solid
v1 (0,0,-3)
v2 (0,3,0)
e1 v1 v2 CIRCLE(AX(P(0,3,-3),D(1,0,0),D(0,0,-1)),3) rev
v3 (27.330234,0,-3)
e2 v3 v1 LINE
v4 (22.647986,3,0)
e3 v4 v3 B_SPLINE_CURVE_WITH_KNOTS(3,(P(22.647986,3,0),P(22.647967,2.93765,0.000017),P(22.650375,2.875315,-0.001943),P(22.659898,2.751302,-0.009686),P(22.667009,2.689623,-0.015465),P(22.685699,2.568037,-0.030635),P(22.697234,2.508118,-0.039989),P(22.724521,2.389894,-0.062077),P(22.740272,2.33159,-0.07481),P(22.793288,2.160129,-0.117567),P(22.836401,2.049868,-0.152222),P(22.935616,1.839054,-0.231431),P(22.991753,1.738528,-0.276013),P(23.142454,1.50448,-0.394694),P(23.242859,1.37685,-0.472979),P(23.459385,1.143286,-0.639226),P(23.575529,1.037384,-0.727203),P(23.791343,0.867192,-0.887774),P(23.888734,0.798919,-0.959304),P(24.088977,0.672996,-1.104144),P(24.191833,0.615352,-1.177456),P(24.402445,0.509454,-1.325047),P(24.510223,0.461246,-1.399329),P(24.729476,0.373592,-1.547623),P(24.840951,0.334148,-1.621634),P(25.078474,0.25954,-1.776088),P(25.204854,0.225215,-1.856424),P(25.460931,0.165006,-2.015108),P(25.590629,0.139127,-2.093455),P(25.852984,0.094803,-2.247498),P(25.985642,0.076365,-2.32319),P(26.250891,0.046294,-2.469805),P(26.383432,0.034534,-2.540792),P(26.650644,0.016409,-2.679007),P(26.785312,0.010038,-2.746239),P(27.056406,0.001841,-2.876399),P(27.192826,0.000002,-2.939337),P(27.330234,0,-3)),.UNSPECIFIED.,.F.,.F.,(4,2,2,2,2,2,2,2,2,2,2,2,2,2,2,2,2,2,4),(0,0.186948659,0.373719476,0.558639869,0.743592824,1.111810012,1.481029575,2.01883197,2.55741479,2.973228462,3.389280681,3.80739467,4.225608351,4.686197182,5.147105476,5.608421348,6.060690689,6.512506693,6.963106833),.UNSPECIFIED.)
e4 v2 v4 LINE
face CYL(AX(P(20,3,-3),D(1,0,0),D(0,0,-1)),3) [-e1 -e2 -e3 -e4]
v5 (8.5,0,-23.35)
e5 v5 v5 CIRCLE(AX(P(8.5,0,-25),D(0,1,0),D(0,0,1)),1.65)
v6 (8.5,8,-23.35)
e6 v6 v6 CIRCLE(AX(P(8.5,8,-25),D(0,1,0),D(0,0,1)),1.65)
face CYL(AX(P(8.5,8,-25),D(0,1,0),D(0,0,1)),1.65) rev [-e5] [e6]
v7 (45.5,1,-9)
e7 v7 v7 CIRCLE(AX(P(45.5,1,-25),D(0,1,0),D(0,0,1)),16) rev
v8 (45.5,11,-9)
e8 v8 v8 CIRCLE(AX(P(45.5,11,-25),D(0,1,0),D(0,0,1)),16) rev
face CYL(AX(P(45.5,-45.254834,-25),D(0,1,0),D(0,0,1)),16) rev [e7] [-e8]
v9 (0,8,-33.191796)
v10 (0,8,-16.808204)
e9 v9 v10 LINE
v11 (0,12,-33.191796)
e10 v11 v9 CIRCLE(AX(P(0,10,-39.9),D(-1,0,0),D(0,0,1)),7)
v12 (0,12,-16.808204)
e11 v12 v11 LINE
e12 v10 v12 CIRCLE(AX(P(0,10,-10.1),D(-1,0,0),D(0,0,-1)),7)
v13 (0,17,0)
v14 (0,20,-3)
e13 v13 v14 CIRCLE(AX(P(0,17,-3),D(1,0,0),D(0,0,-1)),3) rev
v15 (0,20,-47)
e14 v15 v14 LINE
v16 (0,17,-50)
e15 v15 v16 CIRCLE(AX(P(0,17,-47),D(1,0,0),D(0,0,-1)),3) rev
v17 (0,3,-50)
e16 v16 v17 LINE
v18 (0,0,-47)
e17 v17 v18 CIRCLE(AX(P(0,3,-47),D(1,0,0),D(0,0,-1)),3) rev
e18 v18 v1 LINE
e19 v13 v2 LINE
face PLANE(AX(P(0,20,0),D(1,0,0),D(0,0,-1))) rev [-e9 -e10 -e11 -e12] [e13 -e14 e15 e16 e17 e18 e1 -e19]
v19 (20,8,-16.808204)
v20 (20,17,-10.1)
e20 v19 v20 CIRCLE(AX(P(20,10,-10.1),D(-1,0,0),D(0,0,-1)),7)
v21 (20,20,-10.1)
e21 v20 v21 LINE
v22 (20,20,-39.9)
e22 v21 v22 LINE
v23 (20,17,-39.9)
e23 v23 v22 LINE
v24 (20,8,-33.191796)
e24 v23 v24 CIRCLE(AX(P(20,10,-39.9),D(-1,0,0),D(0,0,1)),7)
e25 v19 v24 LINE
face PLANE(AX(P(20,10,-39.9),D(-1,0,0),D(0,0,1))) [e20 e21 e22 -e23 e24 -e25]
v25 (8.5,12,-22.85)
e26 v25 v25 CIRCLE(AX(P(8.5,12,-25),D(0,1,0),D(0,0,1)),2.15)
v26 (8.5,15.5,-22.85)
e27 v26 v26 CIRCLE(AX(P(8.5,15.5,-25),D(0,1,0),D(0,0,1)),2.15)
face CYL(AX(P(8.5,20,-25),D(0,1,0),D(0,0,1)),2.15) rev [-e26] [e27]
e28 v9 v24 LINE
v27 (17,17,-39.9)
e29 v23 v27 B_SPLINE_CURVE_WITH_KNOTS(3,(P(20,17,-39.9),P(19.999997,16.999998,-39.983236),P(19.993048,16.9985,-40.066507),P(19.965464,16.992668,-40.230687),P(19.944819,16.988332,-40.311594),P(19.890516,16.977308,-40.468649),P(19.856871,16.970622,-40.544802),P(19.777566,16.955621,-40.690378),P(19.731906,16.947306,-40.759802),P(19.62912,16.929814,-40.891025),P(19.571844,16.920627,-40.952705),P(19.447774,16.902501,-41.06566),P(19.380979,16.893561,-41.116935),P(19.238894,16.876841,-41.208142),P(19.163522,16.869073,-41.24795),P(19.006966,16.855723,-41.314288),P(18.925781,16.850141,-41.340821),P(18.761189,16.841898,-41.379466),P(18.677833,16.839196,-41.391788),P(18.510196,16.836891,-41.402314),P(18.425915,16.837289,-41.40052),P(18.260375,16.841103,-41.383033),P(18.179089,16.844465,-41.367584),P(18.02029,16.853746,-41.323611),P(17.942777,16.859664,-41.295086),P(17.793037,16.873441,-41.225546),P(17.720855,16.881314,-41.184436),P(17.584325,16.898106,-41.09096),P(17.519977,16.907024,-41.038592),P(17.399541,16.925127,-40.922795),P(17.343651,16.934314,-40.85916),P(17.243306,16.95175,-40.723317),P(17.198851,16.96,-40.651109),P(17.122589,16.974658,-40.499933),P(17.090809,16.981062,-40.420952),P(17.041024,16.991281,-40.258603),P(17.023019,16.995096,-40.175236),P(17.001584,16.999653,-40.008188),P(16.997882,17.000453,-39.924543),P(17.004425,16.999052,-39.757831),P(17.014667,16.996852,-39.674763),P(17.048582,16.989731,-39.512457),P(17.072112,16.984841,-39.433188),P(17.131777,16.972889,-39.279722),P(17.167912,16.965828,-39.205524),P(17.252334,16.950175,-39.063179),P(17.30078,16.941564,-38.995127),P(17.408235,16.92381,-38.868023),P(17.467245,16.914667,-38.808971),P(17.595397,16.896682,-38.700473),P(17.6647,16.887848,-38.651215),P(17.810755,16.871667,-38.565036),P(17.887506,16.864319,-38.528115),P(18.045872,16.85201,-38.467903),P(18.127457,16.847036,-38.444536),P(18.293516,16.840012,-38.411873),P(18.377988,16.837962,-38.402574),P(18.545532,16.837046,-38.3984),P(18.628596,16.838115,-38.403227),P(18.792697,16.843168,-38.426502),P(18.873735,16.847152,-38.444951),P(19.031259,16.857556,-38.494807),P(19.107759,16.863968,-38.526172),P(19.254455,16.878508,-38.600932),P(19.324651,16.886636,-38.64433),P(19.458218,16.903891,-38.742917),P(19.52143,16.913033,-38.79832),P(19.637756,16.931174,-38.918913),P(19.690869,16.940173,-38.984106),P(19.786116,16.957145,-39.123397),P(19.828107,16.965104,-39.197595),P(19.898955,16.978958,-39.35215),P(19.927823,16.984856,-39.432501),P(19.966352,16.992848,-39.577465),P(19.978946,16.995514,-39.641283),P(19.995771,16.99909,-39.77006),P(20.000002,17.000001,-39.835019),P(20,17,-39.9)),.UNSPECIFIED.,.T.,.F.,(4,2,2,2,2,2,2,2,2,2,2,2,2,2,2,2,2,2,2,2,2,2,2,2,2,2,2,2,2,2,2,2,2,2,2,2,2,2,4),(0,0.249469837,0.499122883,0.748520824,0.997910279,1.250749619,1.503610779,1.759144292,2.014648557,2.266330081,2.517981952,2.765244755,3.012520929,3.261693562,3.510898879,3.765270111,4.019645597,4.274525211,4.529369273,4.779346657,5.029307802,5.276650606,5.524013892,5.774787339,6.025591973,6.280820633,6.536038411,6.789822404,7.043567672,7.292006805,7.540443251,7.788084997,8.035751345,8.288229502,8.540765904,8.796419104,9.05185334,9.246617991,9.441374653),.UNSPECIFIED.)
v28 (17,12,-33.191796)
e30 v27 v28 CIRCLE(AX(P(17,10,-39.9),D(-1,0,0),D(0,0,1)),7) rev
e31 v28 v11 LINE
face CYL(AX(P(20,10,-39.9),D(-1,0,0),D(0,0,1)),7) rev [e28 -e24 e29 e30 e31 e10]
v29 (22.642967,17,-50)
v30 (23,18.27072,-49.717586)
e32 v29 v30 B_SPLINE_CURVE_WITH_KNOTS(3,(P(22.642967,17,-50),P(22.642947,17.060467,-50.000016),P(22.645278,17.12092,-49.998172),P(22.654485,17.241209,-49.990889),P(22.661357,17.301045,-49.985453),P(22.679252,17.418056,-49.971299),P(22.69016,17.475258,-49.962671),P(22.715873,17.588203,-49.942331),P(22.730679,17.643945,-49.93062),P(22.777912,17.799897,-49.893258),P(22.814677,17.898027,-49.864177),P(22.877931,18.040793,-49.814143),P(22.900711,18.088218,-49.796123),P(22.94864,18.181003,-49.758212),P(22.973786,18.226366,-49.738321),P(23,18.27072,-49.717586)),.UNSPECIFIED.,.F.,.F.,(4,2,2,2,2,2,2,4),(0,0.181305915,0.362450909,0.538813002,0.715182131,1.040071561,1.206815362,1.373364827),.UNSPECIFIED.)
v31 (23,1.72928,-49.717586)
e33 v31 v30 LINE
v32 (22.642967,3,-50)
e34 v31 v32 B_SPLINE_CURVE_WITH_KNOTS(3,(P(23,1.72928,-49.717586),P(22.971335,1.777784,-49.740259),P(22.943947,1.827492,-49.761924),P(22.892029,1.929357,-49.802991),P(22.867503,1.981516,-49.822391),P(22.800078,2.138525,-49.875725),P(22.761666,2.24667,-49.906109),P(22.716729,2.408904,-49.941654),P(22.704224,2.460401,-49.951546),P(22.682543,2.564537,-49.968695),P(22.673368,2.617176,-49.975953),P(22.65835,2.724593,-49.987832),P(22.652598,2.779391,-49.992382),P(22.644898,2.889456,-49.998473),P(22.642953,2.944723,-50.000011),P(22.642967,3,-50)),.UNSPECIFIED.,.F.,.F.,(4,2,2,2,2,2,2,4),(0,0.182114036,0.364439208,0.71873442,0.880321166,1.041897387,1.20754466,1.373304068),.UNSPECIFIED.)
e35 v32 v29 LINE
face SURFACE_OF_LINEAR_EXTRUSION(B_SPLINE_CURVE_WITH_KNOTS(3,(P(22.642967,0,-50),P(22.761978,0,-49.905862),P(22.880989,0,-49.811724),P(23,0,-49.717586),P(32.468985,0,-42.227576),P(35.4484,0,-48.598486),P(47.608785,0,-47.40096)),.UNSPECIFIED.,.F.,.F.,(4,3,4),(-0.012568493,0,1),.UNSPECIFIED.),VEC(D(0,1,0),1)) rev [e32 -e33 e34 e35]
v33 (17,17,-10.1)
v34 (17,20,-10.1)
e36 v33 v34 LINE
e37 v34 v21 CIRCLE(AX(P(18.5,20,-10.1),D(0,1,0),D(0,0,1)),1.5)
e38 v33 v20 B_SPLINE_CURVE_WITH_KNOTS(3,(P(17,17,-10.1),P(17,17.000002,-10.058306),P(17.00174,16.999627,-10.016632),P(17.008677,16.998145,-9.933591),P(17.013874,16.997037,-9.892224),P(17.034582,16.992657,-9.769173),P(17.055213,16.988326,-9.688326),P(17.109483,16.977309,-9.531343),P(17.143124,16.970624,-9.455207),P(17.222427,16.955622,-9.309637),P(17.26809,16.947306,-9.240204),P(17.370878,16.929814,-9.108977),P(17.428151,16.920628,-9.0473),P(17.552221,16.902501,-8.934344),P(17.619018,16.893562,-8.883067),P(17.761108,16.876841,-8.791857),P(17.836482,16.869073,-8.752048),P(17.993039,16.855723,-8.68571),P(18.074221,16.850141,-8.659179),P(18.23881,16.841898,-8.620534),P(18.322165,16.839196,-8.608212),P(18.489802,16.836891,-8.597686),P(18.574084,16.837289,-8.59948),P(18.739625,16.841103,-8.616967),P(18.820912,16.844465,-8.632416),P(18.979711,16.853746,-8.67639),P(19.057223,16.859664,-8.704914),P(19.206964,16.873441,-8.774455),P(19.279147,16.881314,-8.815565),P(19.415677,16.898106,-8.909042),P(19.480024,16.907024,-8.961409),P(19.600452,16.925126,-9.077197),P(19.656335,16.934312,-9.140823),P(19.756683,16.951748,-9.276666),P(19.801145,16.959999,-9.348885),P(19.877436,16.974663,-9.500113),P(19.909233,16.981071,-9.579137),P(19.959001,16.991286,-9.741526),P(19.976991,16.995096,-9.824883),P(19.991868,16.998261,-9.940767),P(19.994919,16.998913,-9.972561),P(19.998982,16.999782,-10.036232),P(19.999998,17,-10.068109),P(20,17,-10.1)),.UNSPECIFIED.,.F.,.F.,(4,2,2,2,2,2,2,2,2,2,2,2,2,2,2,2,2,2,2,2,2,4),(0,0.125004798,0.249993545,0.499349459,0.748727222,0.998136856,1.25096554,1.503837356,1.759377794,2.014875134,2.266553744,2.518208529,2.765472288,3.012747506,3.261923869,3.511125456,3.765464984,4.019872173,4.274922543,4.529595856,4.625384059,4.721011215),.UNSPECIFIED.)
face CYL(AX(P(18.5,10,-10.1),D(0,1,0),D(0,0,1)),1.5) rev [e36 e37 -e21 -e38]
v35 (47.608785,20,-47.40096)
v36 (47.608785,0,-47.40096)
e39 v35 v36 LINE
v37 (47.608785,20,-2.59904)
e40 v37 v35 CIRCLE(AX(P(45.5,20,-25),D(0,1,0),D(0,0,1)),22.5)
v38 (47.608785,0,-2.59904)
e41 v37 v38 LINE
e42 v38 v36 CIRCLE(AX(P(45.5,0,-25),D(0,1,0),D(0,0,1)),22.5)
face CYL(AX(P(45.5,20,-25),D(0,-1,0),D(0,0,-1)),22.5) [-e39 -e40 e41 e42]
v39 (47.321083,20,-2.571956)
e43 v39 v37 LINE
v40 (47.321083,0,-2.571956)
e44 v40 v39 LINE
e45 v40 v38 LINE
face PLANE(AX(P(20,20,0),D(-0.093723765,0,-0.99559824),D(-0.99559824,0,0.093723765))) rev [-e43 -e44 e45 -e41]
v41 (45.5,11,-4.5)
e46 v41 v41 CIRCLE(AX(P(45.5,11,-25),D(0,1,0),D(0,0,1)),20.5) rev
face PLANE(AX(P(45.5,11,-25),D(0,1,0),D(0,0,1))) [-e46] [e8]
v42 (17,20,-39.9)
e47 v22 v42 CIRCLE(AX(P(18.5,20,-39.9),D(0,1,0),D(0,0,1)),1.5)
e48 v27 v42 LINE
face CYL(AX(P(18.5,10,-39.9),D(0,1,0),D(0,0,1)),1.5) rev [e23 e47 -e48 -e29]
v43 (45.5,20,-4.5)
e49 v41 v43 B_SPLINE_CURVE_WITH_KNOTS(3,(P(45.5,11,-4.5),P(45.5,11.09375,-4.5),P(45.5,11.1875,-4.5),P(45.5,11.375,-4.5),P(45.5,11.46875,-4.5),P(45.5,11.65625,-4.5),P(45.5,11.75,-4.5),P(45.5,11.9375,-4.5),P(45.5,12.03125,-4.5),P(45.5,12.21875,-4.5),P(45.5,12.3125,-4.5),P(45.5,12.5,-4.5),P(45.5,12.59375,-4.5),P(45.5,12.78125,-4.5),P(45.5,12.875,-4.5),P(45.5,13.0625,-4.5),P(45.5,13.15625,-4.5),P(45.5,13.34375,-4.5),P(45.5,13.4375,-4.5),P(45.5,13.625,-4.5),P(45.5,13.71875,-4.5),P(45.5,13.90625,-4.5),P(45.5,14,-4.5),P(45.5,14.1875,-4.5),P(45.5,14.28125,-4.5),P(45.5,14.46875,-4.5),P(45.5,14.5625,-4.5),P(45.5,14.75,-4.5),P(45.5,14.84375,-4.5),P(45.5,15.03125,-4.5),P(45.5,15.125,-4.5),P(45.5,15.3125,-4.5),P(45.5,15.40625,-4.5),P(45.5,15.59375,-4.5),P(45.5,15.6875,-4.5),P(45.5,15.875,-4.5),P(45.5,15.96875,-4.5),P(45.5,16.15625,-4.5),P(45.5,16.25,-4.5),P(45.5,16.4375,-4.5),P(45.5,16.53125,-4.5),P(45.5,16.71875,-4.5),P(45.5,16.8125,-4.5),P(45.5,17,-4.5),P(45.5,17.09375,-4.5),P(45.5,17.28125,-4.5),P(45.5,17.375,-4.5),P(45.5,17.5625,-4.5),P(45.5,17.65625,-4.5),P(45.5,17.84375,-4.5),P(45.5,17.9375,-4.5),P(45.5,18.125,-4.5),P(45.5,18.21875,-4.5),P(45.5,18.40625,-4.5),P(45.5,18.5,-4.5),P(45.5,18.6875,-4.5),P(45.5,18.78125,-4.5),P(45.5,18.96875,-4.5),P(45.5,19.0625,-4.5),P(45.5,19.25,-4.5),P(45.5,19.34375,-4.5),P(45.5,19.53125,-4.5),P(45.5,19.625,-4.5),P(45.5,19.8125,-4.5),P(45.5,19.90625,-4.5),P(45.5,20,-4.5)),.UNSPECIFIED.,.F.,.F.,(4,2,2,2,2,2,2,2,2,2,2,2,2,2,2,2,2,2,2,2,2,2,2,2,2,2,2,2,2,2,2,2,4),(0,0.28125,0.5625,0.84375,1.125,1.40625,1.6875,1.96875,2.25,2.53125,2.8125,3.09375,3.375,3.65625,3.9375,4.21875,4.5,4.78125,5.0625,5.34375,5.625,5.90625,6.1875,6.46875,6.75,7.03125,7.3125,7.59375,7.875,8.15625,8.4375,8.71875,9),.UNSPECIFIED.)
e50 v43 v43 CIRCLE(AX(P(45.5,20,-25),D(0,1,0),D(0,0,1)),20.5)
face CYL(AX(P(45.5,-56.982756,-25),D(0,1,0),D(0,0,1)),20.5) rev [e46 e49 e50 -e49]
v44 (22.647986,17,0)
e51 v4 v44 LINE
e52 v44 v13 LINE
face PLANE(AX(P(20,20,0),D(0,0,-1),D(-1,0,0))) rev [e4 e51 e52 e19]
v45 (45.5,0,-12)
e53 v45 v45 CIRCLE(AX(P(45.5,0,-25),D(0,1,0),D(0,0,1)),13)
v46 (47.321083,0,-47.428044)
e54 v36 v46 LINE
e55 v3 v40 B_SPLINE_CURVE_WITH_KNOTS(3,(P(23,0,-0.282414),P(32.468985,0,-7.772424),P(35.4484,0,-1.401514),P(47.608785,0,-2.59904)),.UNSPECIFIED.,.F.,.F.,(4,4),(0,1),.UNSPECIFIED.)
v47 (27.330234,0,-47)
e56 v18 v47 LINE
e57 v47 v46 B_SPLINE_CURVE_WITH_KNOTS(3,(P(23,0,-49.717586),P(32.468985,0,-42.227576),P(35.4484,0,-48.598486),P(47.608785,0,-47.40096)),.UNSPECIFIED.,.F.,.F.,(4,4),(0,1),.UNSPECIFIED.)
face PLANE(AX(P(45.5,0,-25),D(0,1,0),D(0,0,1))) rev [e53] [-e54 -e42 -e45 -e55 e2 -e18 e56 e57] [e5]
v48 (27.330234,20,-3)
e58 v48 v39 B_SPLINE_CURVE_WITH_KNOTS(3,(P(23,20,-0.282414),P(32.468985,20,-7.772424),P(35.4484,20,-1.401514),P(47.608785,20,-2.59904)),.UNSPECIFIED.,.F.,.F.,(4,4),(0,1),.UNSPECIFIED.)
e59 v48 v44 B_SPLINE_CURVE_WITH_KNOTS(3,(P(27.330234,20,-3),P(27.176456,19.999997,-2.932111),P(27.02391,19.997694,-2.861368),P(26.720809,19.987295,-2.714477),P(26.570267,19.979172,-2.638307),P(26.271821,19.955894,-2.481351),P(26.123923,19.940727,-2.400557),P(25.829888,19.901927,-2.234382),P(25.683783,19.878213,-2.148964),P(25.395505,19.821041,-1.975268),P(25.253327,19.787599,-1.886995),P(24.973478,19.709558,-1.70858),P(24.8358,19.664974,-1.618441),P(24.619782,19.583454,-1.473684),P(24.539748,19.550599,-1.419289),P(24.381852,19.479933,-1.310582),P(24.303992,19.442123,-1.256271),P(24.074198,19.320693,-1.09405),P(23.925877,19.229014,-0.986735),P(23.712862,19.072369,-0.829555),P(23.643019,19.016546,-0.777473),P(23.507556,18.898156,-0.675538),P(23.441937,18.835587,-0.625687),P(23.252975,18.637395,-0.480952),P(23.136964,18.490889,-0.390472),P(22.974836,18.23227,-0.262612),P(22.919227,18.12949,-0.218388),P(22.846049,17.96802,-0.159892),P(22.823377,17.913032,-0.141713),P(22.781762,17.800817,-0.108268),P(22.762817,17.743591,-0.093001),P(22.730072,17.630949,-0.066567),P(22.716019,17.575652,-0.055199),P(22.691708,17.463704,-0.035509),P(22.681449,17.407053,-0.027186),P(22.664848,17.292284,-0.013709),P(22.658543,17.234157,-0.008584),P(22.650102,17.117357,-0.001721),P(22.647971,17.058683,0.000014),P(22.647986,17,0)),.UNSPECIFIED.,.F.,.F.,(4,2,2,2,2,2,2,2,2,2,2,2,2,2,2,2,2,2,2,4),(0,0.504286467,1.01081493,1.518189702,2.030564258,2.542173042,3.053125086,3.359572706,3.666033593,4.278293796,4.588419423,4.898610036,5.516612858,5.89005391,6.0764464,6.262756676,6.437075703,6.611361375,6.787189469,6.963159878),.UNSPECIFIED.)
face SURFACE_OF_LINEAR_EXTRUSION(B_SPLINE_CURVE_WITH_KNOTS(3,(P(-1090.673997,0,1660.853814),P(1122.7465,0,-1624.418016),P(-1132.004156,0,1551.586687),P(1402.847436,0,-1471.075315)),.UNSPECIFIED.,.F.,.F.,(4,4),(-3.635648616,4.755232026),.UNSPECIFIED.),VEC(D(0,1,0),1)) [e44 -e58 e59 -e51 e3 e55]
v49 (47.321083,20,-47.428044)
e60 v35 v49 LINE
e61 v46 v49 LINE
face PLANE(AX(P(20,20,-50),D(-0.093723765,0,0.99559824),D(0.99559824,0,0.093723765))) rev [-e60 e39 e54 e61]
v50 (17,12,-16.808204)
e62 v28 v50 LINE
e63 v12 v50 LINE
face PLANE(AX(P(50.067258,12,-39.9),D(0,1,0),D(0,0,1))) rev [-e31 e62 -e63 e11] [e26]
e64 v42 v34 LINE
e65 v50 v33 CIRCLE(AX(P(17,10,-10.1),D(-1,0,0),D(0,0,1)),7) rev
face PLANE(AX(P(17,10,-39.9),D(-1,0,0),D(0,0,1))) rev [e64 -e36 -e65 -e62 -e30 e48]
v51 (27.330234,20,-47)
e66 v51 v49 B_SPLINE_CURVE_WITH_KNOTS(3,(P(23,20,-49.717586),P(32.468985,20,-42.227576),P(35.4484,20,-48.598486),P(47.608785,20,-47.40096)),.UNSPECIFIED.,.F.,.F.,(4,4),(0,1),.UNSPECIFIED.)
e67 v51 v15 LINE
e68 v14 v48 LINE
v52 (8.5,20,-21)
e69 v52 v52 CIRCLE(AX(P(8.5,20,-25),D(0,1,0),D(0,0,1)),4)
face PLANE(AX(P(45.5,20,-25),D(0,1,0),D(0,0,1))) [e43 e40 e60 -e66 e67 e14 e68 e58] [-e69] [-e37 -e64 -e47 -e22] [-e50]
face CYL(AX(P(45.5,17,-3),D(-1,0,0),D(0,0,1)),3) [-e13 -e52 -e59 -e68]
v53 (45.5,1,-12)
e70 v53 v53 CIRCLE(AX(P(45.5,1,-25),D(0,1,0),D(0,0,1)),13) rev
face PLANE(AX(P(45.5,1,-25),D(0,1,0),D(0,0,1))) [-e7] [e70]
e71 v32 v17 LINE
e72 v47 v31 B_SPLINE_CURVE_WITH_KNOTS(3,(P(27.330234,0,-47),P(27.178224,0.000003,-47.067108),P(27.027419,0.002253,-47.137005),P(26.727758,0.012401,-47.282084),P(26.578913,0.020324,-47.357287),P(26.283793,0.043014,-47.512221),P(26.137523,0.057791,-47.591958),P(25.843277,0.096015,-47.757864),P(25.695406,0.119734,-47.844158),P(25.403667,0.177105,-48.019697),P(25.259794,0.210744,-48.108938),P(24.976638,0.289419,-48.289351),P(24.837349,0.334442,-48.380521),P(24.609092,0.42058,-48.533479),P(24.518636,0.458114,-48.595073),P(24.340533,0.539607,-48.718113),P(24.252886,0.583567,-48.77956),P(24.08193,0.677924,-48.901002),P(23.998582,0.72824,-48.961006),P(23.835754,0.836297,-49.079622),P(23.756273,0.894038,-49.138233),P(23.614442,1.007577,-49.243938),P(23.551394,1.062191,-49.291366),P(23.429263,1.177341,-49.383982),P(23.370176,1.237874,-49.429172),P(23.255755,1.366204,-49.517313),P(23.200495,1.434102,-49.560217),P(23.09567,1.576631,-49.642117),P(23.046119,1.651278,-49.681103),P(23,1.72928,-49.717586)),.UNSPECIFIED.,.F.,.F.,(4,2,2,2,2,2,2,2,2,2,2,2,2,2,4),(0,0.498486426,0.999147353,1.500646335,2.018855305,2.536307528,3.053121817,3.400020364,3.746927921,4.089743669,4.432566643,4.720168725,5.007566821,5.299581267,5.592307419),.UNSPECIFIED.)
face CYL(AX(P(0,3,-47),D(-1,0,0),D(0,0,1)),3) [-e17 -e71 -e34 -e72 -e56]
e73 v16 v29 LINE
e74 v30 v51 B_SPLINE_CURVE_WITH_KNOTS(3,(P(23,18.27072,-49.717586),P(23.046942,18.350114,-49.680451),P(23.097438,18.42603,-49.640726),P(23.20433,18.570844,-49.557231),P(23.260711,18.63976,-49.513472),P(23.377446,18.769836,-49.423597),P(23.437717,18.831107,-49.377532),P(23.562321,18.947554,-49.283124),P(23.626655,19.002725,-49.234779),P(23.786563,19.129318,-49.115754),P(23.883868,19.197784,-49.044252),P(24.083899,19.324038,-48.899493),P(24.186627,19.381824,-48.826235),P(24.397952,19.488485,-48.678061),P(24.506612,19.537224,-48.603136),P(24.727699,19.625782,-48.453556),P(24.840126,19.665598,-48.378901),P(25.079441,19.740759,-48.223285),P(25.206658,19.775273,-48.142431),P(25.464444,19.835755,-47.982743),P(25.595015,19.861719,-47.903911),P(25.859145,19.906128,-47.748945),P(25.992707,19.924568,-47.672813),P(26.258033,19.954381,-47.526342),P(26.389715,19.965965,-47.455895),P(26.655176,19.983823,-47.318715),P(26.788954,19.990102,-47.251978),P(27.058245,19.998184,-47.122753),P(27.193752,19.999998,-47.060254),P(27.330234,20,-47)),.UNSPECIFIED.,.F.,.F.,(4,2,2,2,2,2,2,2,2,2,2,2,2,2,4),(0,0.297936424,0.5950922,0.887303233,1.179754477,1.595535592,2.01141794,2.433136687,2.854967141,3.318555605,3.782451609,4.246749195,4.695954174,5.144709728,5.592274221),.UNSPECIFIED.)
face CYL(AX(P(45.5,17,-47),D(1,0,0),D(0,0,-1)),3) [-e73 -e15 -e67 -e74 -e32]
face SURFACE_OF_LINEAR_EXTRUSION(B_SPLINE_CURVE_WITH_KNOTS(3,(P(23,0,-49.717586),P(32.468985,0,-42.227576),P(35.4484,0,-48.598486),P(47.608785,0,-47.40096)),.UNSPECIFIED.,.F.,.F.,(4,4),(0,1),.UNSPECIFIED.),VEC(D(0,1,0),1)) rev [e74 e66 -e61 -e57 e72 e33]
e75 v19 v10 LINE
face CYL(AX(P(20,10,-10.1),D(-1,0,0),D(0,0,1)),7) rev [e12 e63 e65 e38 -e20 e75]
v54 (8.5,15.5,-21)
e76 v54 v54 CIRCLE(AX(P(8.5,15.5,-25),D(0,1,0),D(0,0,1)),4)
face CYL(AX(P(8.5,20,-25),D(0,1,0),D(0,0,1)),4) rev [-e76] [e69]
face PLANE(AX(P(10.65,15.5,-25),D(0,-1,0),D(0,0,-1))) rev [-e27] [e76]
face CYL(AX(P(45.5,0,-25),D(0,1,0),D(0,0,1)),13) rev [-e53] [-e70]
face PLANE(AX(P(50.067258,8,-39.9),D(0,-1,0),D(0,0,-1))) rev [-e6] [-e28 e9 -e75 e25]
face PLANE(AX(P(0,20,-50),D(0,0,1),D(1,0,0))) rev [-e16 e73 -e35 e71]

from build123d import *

# Parameters (mm, degrees)
EXTRUDE_1_DEPTH             = 20
SKETCH_2_R                  = 7
CUT_EXTRUDE_1_DEPTH         = 20
SKETCH_3_R                  = 13
CUT_EXTRUDE_2_DEPTH         = 87.740993769
SKETCH_4_R                  = 16
CUT_EXTRUDE_3_DEPTH         = 19
CUT_EXTRUDE_9_DEPTH         = 87.740993769
EXTRUDE_START               = -20
EXTRUDE_4_DEPTH             = 20
FILLET_2_R                  = 3
SKETCH_7_R                  = 20.5
CUT_EXTRUDE_10_DEPTH        = 9
SKETCH_8_W                  = 29.8
SKETCH_8_H                  = 4
CUT_EXTRUDE_11_DEPTH        = 20
CUT_EXTRUDE_12_DEPTH        = 10
HOLE_WIZARD_M41_D           = 4.3
HOLE_WIZARD_M41_DEPTH       = 8
HOLE_WIZARD_M41_CBORE_D     = 8
HOLE_WIZARD_M41_CBORE_DEPTH = 4.5
M4X0_71_D                   = 3.3


# Read off the part's stored shape, not the designer's step: Бобышка-Вытянуть4
with BuildPart() as part:
    # Эскиз1 → Бобышка-Вытянуть1 (new body)
    with BuildSketch(Plane(origin=(0, 0, 0), x_dir=(1, 0, 0), z_dir=(0, 1, 0))):
        with BuildLine():
            Line((0, 0), (0, 50))
            Line((0, 50), (20, 50))
            Line((20, 50), (47.60878471, 47.400960405))
            ThreePointArc((47.60878471, 47.400960405), (68, 25), (47.60878471, 2.599039595))
            Line((47.60878471, 2.599039595), (20, 0))
            Line((20, 0), (0, 0))
        make_face()
    extrude(amount=EXTRUDE_1_DEPTH)

    # Эскиз2 → Вырез-Вытянуть1 (cut)
    with BuildSketch(Plane.ZY):
        with Locations((-39.9, 10)):
            Circle(SKETCH_2_R)
        with Locations(Location((-10.1, 10, 0), (0, 0, 180))):
            Circle(SKETCH_2_R)
    extrude(amount=-CUT_EXTRUDE_1_DEPTH, mode=Mode.SUBTRACT)

    # Эскиз3 → Вырез-Вытянуть2 (cut, through all)
    with BuildSketch(Plane(origin=(0, 20, 0), x_dir=(1, 0, 0), z_dir=(0, 1, 0))):
        with Locations(Location((45.5, 25, 0), (0, 0, 270))):
            Circle(SKETCH_3_R)
    extrude(amount=-CUT_EXTRUDE_2_DEPTH, mode=Mode.SUBTRACT)

    # Эскиз4 → Вырез-Вытянуть3 (cut)
    with BuildSketch(Plane(origin=(0, 20, 0), x_dir=(1, 0, 0), z_dir=(0, 1, 0))):
        with Locations(Location((45.5, 25, 0), (0, 0, 270))):
            Circle(SKETCH_4_R)
    extrude(amount=-CUT_EXTRUDE_3_DEPTH, mode=Mode.SUBTRACT)

    # Эскиз5 → Вырез-Вытянуть9 (cut, through all)
    with BuildSketch(Plane(origin=(0, 20, 0), x_dir=(1, 0, 0), z_dir=(0, 1, 0))):
        with BuildLine():
            add(Edge.make_bspline(
                [(47.32108314, 47.428044097), (47.41641101, 47.41948544), (47.512308925, 47.410461109), (47.60878471, 47.400960405)],
                knots=[0.992066387, 0.992066387, 0.992066387, 0.992066387, 1, 1, 1, 1], degree=3))
            Line((47.32108314, 47.428044095), (47.60878471, 47.400960405))
        make_face()
        with BuildLine():
            Line((47.32108314, 47.428044097), (23, 49.717585585))
            add(Edge.make_bspline(
                [(23, 49.717585585), (32.393861284, 42.286998451), (35.400716473, 48.498269788), (47.32108314, 47.428044097)],
                knots=[0, 0, 0, 0, 0.992066387, 0.992066387, 0.992066387, 0.992066387], degree=3))
        make_face()
        with BuildLine():
            add(Edge.make_bspline(
                [(23, 0.282414415), (32.393861284, 7.713001549), (35.400716473, 1.501730212), (47.32108314, 2.571955903)],
                knots=[0, 0, 0, 0, 0.992066387, 0.992066387, 0.992066387, 0.992066387], degree=3))
            Line((23, 0.282414415), (47.32108314, 2.571955903))
        make_face()
        with BuildLine():
            Line((47.60878471, 2.599039595), (47.32108314, 2.571955905))
            add(Edge.make_bspline(
                [(47.32108314, 2.571955903), (47.41641101, 2.58051456), (47.512308925, 2.589538891), (47.60878471, 2.599039595)],
                knots=[0.992066387, 0.992066387, 0.992066387, 0.992066387, 1, 1, 1, 1], degree=3))
        make_face()
    extrude(amount=-CUT_EXTRUDE_9_DEPTH, mode=Mode.SUBTRACT)

    # Бобышка-Вытянуть4 outline → Бобышка-Вытянуть4 (add)
    with BuildSketch(Plane(origin=(0, 20, 0), x_dir=(1, 0, 0), z_dir=(0, 1, 0)).offset(EXTRUDE_START)):
        with BuildLine():
            add(Edge.make_bspline(
                [(22.6429674, 50), (22.761978267, 49.905861862), (22.880989133, 49.811723723), (23, 49.717585585)],
                knots=[-0.012568493, -0.012568493, -0.012568493, -0.012568493, 0, 0, 0, 0], degree=3))
            Line((22.6429674, 50), (20, 50))
            Line((20, 50), (23, 49.717585585))
        make_face()
        with BuildLine():
            Line((20, 0), (22.6479861, 0))
            add(Edge.make_bspline(
                [(22.6479861, 0), (22.766323231, 0.09625734), (22.883651508, 0.190382227), (23, 0.282414415)],
                knots=[-0.012287325, -0.012287325, -0.012287325, -0.012287325, 0, 0, 0, 0], degree=3))
            Line((23, 0.282414415), (20, 0))
        make_face()
    extrude(amount=EXTRUDE_4_DEPTH)

    # Скругление2
    fillet_2_edges = [part.edges().sort_by_distance(p)[0] for p in [
        (11.32399305, 0, 0),
        (11.32399305, 20, 0),
        (11.3214837, 0, -50),
        (11.3214837, 20, -50),
    ]]
    fillet(fillet_2_edges, radius=FILLET_2_R)

    # Эскиз7 → Вырез-Вытянуть10 (cut)
    with BuildSketch(Plane(origin=(0, 20, 0), x_dir=(1, 0, 0), z_dir=(0, 1, 0))):
        with Locations(Location((45.5, 25, 0), (0, 0, 270))):
            Circle(SKETCH_7_R)
    extrude(amount=-CUT_EXTRUDE_10_DEPTH, mode=Mode.SUBTRACT)

    # Эскиз8 → Вырез-Вытянуть11 (cut)
    with BuildSketch(Plane.ZY):
        with Locations((-25, 10)):
            Rectangle(SKETCH_8_W, SKETCH_8_H)
    extrude(amount=-CUT_EXTRUDE_11_DEPTH, mode=Mode.SUBTRACT)

    # Эскиз9 → Вырез-Вытянуть12 (cut)
    with BuildSketch(Plane(origin=(0, 20, 0), x_dir=(1, 0, 0), z_dir=(0, 1, 0))):
        with BuildLine():
            Line((20, 39.9), (20, 10.1))
            ThreePointArc((20, 10.1), (18.5, 8.6), (17, 10.1))
            Line((17, 10.1), (17, 39.9))
            ThreePointArc((17, 39.9), (18.5, 41.4), (20, 39.9))
        make_face()
    extrude(amount=-CUT_EXTRUDE_12_DEPTH, mode=Mode.SUBTRACT)

    # Цековка для винта с внутренним шестигранником M41
    with Locations(Plane(origin=(0, 20, 0), x_dir=(1, 0, 0), z_dir=(0, 1, 0))):
        with Locations((8.5, 25)):
            CounterBoreHole(HOLE_WIZARD_M41_D / 2, HOLE_WIZARD_M41_CBORE_D / 2, HOLE_WIZARD_M41_CBORE_DEPTH, depth=HOLE_WIZARD_M41_DEPTH)

    # Отверстие обработанное метчиком M4x0.71 (through all)
    with Locations(Plane(origin=(0, 8, 0), x_dir=(1, 0, 0), z_dir=(0, 1, 0))):
        with Locations((8.5, 25)):
            Hole(M4X0_71_D / 2)


solid = part.part
